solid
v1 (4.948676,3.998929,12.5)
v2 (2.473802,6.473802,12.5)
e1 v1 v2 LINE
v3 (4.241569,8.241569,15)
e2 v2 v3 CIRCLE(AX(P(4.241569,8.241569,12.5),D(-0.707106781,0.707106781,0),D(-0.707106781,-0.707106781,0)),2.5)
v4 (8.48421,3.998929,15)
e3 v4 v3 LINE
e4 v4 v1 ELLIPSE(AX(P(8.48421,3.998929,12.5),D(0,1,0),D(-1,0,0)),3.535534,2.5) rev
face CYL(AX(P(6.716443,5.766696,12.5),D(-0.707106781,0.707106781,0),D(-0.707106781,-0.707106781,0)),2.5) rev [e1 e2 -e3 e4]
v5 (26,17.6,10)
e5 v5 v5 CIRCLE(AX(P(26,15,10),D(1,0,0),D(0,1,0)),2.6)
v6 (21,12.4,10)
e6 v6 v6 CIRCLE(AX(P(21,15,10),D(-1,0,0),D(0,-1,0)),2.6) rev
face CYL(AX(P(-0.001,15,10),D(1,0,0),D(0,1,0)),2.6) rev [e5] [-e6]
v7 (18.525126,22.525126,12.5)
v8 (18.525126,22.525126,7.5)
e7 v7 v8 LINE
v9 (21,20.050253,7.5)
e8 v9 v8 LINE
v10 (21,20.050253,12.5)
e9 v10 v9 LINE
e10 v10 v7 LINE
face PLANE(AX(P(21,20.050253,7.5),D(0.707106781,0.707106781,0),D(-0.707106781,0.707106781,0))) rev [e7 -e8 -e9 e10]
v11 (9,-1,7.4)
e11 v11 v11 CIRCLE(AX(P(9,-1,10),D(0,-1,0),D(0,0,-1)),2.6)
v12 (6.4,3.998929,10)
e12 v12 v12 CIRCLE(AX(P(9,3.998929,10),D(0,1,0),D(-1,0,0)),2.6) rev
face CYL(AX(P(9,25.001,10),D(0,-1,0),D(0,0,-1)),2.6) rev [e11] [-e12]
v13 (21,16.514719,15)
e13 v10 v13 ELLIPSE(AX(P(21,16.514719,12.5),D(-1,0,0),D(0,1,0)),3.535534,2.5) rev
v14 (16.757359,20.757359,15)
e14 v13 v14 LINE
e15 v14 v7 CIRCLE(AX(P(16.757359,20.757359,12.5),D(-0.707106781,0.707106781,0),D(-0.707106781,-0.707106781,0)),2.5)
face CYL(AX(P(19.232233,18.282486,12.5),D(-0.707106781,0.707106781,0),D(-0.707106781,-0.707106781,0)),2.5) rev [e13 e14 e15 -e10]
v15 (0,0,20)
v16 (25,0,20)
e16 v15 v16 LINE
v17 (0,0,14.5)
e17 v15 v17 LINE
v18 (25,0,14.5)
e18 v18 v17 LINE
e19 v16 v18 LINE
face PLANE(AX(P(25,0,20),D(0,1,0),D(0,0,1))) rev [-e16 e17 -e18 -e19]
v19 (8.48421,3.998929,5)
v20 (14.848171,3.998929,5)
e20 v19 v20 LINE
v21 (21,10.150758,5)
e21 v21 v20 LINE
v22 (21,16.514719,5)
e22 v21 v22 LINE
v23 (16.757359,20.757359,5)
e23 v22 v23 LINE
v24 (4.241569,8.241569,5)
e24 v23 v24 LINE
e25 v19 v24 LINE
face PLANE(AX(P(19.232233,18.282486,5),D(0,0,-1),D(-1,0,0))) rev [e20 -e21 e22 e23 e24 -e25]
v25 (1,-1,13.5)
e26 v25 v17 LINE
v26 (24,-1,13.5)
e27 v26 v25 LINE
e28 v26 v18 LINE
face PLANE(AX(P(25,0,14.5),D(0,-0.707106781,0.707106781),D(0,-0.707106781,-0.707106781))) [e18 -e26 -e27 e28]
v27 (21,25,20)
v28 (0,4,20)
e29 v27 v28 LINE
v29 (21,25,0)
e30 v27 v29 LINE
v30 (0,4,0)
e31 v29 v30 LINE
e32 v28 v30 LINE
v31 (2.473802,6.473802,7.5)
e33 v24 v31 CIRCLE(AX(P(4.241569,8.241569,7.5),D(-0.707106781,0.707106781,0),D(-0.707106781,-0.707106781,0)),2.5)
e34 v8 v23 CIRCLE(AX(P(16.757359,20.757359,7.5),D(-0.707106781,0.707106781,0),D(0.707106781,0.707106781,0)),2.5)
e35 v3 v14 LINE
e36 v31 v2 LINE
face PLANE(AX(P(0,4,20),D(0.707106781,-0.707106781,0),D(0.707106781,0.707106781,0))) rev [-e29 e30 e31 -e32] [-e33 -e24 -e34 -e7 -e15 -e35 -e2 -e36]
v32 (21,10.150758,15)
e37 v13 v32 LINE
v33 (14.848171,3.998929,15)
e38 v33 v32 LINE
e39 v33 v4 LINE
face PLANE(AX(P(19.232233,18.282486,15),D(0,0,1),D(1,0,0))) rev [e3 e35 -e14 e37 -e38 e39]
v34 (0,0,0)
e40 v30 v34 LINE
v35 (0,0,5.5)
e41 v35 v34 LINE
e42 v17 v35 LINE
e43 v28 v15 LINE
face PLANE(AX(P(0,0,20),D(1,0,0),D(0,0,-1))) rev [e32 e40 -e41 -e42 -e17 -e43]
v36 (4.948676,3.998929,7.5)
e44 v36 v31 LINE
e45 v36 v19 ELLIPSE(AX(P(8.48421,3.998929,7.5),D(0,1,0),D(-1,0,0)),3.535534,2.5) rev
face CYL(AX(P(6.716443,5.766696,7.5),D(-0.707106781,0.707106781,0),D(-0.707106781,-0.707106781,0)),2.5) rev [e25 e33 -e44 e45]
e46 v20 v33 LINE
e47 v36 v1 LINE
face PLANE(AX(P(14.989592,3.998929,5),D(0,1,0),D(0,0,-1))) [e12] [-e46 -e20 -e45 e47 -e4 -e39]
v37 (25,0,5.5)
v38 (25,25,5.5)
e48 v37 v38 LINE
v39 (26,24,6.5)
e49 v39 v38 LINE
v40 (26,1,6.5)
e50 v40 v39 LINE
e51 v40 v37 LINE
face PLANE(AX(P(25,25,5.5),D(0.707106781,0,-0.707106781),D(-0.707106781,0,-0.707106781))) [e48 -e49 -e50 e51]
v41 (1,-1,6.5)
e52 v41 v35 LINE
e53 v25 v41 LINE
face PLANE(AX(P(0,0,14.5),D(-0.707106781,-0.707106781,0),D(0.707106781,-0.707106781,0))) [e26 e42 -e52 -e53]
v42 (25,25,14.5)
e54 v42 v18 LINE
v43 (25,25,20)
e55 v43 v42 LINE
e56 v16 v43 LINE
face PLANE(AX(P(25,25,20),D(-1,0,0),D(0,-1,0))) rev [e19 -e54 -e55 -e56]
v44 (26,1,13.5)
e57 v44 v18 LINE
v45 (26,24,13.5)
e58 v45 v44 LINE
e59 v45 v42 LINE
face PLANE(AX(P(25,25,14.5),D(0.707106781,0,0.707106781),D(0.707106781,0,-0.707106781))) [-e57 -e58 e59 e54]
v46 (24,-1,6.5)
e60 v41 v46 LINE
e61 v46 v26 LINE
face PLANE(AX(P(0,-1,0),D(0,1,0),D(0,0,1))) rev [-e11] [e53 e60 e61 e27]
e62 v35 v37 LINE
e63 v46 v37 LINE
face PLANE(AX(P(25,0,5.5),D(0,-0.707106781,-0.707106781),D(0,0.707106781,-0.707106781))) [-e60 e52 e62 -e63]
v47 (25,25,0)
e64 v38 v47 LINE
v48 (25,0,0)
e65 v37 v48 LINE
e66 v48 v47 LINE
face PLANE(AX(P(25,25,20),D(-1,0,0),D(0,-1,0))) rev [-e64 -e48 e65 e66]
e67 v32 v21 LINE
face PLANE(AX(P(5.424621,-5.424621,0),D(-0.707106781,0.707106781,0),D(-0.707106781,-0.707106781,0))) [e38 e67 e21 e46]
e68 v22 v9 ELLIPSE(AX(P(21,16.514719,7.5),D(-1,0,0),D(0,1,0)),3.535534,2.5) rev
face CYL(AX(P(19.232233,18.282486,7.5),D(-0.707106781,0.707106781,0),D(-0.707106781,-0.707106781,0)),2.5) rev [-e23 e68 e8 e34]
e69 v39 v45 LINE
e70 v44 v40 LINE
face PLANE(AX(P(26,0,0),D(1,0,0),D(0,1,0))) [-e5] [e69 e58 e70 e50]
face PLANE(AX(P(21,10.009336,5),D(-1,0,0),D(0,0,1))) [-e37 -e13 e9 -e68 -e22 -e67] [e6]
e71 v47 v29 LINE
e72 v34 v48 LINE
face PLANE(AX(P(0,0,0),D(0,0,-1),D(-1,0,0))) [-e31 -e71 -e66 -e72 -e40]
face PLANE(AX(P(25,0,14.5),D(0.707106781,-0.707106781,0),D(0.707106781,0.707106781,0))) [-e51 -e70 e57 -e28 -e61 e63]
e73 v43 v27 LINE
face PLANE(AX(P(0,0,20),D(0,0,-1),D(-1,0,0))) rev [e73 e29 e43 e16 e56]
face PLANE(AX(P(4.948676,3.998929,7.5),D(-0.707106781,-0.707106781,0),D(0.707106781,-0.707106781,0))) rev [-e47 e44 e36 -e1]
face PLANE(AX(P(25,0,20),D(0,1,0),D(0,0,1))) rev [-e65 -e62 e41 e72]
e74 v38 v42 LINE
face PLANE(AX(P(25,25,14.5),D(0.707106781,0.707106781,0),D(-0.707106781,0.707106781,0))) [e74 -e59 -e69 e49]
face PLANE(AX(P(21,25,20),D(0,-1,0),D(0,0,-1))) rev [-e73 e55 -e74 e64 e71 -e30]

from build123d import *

# Parameters (mm, degrees)
BOSS_EXTRUDE1_DEPTH = 20
SKETCH2_W           = 9
SKETCH2_H           = 25
BOSS_EXTRUDE2_DEPTH = 1
BOSS_EXTRUDE2_TAPER = 45
SKETCH3_W           = 25
SKETCH3_H           = 9
BOSS_EXTRUDE3_DEPTH = 1
BOSS_EXTRUDE3_TAPER = 45
CUT_EXTRUDE3_DEPTH  = 3.5
SKETCH9_W           = 10
SKETCH9_H           = 8.5
CUT_EXTRUDE4_DEPTH  = 7
CHAMFER3_START      = 7.5
CHAMFER3_DEPTH      = 5
CHAMFER3_START_2    = 5
CHAMFER3_2_DEPTH    = 10
CHAMFER3_START_3    = 0.671572875
CHAMFER3_3_DEPTH    = 2.5
CUT_EXTRUDE5_REACH  = 43.857
SKETCH4_R           = 2.6
CUT_EXTRUDE6_REACH  = 43.243
SKETCH5_R           = 2.6


with BuildPart() as part:
    # Sketch1 → Boss-Extrude1 (new body)
    with BuildSketch(Plane.XY):
        Polygon((0, 0), (0, 4), (21, 25), (25, 25), (25, 0), align=None)
    extrude(amount=BOSS_EXTRUDE1_DEPTH)

    # Sketch2 → Boss-Extrude2 (add)
    with BuildSketch(Plane(origin=(25, 0, 0), x_dir=(0, 0, -1), z_dir=(1, 0, 0))):
        with Locations((-10, 12.5)):
            Rectangle(SKETCH2_W, SKETCH2_H)
    extrude(amount=BOSS_EXTRUDE2_DEPTH, taper=BOSS_EXTRUDE2_TAPER)

    # Sketch3 → Boss-Extrude3 (add)
    with BuildSketch(Plane.XZ):
        with Locations((12.5, 10)):
            Rectangle(SKETCH3_W, SKETCH3_H)
    extrude(amount=BOSS_EXTRUDE3_DEPTH, taper=BOSS_EXTRUDE3_TAPER)

    # Sketch7 → Cut-Extrude3 (cut)
    with BuildSketch(Plane(origin=(-2, 2, 0), x_dir=(0, 0, 1), z_dir=(-0.7071067811865464, 0.7071067811865487, 0))):
        with BuildLine():
            Line((7.5, 29.026911935), (12.5, 29.026911935))
            ThreePointArc((12.5, 29.026911935), (14.267766953, 28.294678888), (15, 26.526911935))
            Line((15, 26.526911935), (15, 8.826911935))
            ThreePointArc((15, 8.826911935), (14.267766953, 7.059144982), (12.5, 6.326911935))
            Line((12.5, 6.326911935), (7.5, 6.326911935))
            ThreePointArc((7.5, 6.326911935), (5.732233047, 7.059144982), (5, 8.826911935))
            Line((5, 8.826911935), (5, 26.526911935))
            ThreePointArc((5, 26.526911935), (5.732233047, 28.294678888), (7.5, 29.026911935))
        make_face()
    extrude(amount=-CUT_EXTRUDE3_DEPTH, mode=Mode.SUBTRACT)

    # Sketch9 → Cut-Extrude4 (cut)
    with BuildSketch(Plane(origin=(0.474873734, -0.474873734, 0), x_dir=(0, 0, 1), z_dir=(-0.7071067811865464, 0.7071067811865487, 0))):
        with Locations((10, 17.676911935)):
            Rectangle(SKETCH9_W, SKETCH9_H)
    extrude(amount=-CUT_EXTRUDE4_DEPTH, mode=Mode.SUBTRACT)

    # Chamfer3: read off the stored shape, not the designer's step
    # Chamfer3 outline → Chamfer3 (cut)
    with BuildSketch(Plane.XY.offset(CHAMFER3_START)):
        Polygon((15.979541854, 15.029794385), (20.929289322, 10.080046917), (21, 10.150757595), (21, 20.050252532), align=None)
        Polygon((4.948676067, 3.998928599), (14.848171004, 3.998928599), (14.918881682, 4.069639277), (9.969134213, 9.019386745), align=None)
    extrude(amount=CHAMFER3_DEPTH, mode=Mode.SUBTRACT)

    # Chamfer3 2 outline → Chamfer3 2 (cut)
    with BuildSketch(Plane.XY.offset(CHAMFER3_START_2)):
        Polygon((15.979541854, 15.029794385), (20.929289322, 10.080046917), (21, 10.150757595), (21, 20.050252532), align=None)
        Polygon((4.948676067, 3.998928599), (14.848171004, 3.998928599), (14.918881682, 4.069639277), (9.969134213, 9.019386745), align=None)
    extrude(amount=CHAMFER3_2_DEPTH, mode=Mode.SUBTRACT)

    # Chamfer3 3 outline → Chamfer3 3 (add)
    with BuildSketch(Plane(origin=(0, 0, 0), x_dir=(0.707106781186549, 0.707106781186546, 0), z_dir=(0.707106781186546, -0.707106781186549, 0)).offset(CHAMFER3_START_3)):
        with BuildLine():
            Line((6.326911935, 5.000000001), (8.826911935, 5))
            ThreePointArc((8.826911935, 5), (7.059144982, 5.732233047), (6.326911935, 7.5))
            Line((6.326911935, 7.5), (6.326911935, 5.000000001))
        make_face()
        with BuildLine():
            ThreePointArc((29.026911935, 7.5), (28.294678888, 5.732233047), (26.526911935, 5))
            Line((26.526911935, 5), (29.026911935, 5.000000001))
            Line((29.026911935, 5.000000001), (29.026911935, 7.5))
        make_face()
        with BuildLine():
            Line((6.326911935, 14.999999999), (6.326911935, 12.5))
            ThreePointArc((6.326911935, 12.5), (7.059144982, 14.267766953), (8.826911935, 15))
            Line((8.826911935, 15), (6.326911935, 14.999999999))
        make_face()
        with BuildLine():
            ThreePointArc((26.526911935, 15), (28.294678888, 14.267766953), (29.026911935, 12.5))
            Line((29.026911935, 12.5), (29.026911935, 14.999999999))
            Line((29.026911935, 14.999999999), (26.526911935, 15))
        make_face()
    extrude(amount=CHAMFER3_3_DEPTH)

    # Sketch4 → Cut-Extrude5 (cut, up to next)
    with BuildSketch(Plane.XZ.offset(1), mode=Mode.PRIVATE) as cut_extrude5_sk1:
        with Locations(Location((9, 10, 0), (0, 0, 270))):
            Circle(SKETCH4_R)
    cut_extrude5_tool1 = extrude(cut_extrude5_sk1.sketch, amount=-CUT_EXTRUDE5_REACH, mode=Mode.PRIVATE) & part.part
    add(cut_extrude5_tool1.solids().sort_by_distance((9, -1, 10))[0], mode=Mode.SUBTRACT)

    # Sketch5 → Cut-Extrude6 (cut, up to next)
    with BuildSketch(Plane(origin=(26, 0, 0), x_dir=(0, 0, -1), z_dir=(1, 0, 0)), mode=Mode.PRIVATE) as cut_extrude6_sk1:
        with Locations(Location((-10, 15, 0), (0, 0, 90))):
            Circle(SKETCH5_R)
    cut_extrude6_tool1 = extrude(cut_extrude6_sk1.sketch, amount=-CUT_EXTRUDE6_REACH, mode=Mode.PRIVATE) & part.part
    add(cut_extrude6_tool1.solids().sort_by_distance((26, 15, 10))[0], mode=Mode.SUBTRACT)


solid = part.part
